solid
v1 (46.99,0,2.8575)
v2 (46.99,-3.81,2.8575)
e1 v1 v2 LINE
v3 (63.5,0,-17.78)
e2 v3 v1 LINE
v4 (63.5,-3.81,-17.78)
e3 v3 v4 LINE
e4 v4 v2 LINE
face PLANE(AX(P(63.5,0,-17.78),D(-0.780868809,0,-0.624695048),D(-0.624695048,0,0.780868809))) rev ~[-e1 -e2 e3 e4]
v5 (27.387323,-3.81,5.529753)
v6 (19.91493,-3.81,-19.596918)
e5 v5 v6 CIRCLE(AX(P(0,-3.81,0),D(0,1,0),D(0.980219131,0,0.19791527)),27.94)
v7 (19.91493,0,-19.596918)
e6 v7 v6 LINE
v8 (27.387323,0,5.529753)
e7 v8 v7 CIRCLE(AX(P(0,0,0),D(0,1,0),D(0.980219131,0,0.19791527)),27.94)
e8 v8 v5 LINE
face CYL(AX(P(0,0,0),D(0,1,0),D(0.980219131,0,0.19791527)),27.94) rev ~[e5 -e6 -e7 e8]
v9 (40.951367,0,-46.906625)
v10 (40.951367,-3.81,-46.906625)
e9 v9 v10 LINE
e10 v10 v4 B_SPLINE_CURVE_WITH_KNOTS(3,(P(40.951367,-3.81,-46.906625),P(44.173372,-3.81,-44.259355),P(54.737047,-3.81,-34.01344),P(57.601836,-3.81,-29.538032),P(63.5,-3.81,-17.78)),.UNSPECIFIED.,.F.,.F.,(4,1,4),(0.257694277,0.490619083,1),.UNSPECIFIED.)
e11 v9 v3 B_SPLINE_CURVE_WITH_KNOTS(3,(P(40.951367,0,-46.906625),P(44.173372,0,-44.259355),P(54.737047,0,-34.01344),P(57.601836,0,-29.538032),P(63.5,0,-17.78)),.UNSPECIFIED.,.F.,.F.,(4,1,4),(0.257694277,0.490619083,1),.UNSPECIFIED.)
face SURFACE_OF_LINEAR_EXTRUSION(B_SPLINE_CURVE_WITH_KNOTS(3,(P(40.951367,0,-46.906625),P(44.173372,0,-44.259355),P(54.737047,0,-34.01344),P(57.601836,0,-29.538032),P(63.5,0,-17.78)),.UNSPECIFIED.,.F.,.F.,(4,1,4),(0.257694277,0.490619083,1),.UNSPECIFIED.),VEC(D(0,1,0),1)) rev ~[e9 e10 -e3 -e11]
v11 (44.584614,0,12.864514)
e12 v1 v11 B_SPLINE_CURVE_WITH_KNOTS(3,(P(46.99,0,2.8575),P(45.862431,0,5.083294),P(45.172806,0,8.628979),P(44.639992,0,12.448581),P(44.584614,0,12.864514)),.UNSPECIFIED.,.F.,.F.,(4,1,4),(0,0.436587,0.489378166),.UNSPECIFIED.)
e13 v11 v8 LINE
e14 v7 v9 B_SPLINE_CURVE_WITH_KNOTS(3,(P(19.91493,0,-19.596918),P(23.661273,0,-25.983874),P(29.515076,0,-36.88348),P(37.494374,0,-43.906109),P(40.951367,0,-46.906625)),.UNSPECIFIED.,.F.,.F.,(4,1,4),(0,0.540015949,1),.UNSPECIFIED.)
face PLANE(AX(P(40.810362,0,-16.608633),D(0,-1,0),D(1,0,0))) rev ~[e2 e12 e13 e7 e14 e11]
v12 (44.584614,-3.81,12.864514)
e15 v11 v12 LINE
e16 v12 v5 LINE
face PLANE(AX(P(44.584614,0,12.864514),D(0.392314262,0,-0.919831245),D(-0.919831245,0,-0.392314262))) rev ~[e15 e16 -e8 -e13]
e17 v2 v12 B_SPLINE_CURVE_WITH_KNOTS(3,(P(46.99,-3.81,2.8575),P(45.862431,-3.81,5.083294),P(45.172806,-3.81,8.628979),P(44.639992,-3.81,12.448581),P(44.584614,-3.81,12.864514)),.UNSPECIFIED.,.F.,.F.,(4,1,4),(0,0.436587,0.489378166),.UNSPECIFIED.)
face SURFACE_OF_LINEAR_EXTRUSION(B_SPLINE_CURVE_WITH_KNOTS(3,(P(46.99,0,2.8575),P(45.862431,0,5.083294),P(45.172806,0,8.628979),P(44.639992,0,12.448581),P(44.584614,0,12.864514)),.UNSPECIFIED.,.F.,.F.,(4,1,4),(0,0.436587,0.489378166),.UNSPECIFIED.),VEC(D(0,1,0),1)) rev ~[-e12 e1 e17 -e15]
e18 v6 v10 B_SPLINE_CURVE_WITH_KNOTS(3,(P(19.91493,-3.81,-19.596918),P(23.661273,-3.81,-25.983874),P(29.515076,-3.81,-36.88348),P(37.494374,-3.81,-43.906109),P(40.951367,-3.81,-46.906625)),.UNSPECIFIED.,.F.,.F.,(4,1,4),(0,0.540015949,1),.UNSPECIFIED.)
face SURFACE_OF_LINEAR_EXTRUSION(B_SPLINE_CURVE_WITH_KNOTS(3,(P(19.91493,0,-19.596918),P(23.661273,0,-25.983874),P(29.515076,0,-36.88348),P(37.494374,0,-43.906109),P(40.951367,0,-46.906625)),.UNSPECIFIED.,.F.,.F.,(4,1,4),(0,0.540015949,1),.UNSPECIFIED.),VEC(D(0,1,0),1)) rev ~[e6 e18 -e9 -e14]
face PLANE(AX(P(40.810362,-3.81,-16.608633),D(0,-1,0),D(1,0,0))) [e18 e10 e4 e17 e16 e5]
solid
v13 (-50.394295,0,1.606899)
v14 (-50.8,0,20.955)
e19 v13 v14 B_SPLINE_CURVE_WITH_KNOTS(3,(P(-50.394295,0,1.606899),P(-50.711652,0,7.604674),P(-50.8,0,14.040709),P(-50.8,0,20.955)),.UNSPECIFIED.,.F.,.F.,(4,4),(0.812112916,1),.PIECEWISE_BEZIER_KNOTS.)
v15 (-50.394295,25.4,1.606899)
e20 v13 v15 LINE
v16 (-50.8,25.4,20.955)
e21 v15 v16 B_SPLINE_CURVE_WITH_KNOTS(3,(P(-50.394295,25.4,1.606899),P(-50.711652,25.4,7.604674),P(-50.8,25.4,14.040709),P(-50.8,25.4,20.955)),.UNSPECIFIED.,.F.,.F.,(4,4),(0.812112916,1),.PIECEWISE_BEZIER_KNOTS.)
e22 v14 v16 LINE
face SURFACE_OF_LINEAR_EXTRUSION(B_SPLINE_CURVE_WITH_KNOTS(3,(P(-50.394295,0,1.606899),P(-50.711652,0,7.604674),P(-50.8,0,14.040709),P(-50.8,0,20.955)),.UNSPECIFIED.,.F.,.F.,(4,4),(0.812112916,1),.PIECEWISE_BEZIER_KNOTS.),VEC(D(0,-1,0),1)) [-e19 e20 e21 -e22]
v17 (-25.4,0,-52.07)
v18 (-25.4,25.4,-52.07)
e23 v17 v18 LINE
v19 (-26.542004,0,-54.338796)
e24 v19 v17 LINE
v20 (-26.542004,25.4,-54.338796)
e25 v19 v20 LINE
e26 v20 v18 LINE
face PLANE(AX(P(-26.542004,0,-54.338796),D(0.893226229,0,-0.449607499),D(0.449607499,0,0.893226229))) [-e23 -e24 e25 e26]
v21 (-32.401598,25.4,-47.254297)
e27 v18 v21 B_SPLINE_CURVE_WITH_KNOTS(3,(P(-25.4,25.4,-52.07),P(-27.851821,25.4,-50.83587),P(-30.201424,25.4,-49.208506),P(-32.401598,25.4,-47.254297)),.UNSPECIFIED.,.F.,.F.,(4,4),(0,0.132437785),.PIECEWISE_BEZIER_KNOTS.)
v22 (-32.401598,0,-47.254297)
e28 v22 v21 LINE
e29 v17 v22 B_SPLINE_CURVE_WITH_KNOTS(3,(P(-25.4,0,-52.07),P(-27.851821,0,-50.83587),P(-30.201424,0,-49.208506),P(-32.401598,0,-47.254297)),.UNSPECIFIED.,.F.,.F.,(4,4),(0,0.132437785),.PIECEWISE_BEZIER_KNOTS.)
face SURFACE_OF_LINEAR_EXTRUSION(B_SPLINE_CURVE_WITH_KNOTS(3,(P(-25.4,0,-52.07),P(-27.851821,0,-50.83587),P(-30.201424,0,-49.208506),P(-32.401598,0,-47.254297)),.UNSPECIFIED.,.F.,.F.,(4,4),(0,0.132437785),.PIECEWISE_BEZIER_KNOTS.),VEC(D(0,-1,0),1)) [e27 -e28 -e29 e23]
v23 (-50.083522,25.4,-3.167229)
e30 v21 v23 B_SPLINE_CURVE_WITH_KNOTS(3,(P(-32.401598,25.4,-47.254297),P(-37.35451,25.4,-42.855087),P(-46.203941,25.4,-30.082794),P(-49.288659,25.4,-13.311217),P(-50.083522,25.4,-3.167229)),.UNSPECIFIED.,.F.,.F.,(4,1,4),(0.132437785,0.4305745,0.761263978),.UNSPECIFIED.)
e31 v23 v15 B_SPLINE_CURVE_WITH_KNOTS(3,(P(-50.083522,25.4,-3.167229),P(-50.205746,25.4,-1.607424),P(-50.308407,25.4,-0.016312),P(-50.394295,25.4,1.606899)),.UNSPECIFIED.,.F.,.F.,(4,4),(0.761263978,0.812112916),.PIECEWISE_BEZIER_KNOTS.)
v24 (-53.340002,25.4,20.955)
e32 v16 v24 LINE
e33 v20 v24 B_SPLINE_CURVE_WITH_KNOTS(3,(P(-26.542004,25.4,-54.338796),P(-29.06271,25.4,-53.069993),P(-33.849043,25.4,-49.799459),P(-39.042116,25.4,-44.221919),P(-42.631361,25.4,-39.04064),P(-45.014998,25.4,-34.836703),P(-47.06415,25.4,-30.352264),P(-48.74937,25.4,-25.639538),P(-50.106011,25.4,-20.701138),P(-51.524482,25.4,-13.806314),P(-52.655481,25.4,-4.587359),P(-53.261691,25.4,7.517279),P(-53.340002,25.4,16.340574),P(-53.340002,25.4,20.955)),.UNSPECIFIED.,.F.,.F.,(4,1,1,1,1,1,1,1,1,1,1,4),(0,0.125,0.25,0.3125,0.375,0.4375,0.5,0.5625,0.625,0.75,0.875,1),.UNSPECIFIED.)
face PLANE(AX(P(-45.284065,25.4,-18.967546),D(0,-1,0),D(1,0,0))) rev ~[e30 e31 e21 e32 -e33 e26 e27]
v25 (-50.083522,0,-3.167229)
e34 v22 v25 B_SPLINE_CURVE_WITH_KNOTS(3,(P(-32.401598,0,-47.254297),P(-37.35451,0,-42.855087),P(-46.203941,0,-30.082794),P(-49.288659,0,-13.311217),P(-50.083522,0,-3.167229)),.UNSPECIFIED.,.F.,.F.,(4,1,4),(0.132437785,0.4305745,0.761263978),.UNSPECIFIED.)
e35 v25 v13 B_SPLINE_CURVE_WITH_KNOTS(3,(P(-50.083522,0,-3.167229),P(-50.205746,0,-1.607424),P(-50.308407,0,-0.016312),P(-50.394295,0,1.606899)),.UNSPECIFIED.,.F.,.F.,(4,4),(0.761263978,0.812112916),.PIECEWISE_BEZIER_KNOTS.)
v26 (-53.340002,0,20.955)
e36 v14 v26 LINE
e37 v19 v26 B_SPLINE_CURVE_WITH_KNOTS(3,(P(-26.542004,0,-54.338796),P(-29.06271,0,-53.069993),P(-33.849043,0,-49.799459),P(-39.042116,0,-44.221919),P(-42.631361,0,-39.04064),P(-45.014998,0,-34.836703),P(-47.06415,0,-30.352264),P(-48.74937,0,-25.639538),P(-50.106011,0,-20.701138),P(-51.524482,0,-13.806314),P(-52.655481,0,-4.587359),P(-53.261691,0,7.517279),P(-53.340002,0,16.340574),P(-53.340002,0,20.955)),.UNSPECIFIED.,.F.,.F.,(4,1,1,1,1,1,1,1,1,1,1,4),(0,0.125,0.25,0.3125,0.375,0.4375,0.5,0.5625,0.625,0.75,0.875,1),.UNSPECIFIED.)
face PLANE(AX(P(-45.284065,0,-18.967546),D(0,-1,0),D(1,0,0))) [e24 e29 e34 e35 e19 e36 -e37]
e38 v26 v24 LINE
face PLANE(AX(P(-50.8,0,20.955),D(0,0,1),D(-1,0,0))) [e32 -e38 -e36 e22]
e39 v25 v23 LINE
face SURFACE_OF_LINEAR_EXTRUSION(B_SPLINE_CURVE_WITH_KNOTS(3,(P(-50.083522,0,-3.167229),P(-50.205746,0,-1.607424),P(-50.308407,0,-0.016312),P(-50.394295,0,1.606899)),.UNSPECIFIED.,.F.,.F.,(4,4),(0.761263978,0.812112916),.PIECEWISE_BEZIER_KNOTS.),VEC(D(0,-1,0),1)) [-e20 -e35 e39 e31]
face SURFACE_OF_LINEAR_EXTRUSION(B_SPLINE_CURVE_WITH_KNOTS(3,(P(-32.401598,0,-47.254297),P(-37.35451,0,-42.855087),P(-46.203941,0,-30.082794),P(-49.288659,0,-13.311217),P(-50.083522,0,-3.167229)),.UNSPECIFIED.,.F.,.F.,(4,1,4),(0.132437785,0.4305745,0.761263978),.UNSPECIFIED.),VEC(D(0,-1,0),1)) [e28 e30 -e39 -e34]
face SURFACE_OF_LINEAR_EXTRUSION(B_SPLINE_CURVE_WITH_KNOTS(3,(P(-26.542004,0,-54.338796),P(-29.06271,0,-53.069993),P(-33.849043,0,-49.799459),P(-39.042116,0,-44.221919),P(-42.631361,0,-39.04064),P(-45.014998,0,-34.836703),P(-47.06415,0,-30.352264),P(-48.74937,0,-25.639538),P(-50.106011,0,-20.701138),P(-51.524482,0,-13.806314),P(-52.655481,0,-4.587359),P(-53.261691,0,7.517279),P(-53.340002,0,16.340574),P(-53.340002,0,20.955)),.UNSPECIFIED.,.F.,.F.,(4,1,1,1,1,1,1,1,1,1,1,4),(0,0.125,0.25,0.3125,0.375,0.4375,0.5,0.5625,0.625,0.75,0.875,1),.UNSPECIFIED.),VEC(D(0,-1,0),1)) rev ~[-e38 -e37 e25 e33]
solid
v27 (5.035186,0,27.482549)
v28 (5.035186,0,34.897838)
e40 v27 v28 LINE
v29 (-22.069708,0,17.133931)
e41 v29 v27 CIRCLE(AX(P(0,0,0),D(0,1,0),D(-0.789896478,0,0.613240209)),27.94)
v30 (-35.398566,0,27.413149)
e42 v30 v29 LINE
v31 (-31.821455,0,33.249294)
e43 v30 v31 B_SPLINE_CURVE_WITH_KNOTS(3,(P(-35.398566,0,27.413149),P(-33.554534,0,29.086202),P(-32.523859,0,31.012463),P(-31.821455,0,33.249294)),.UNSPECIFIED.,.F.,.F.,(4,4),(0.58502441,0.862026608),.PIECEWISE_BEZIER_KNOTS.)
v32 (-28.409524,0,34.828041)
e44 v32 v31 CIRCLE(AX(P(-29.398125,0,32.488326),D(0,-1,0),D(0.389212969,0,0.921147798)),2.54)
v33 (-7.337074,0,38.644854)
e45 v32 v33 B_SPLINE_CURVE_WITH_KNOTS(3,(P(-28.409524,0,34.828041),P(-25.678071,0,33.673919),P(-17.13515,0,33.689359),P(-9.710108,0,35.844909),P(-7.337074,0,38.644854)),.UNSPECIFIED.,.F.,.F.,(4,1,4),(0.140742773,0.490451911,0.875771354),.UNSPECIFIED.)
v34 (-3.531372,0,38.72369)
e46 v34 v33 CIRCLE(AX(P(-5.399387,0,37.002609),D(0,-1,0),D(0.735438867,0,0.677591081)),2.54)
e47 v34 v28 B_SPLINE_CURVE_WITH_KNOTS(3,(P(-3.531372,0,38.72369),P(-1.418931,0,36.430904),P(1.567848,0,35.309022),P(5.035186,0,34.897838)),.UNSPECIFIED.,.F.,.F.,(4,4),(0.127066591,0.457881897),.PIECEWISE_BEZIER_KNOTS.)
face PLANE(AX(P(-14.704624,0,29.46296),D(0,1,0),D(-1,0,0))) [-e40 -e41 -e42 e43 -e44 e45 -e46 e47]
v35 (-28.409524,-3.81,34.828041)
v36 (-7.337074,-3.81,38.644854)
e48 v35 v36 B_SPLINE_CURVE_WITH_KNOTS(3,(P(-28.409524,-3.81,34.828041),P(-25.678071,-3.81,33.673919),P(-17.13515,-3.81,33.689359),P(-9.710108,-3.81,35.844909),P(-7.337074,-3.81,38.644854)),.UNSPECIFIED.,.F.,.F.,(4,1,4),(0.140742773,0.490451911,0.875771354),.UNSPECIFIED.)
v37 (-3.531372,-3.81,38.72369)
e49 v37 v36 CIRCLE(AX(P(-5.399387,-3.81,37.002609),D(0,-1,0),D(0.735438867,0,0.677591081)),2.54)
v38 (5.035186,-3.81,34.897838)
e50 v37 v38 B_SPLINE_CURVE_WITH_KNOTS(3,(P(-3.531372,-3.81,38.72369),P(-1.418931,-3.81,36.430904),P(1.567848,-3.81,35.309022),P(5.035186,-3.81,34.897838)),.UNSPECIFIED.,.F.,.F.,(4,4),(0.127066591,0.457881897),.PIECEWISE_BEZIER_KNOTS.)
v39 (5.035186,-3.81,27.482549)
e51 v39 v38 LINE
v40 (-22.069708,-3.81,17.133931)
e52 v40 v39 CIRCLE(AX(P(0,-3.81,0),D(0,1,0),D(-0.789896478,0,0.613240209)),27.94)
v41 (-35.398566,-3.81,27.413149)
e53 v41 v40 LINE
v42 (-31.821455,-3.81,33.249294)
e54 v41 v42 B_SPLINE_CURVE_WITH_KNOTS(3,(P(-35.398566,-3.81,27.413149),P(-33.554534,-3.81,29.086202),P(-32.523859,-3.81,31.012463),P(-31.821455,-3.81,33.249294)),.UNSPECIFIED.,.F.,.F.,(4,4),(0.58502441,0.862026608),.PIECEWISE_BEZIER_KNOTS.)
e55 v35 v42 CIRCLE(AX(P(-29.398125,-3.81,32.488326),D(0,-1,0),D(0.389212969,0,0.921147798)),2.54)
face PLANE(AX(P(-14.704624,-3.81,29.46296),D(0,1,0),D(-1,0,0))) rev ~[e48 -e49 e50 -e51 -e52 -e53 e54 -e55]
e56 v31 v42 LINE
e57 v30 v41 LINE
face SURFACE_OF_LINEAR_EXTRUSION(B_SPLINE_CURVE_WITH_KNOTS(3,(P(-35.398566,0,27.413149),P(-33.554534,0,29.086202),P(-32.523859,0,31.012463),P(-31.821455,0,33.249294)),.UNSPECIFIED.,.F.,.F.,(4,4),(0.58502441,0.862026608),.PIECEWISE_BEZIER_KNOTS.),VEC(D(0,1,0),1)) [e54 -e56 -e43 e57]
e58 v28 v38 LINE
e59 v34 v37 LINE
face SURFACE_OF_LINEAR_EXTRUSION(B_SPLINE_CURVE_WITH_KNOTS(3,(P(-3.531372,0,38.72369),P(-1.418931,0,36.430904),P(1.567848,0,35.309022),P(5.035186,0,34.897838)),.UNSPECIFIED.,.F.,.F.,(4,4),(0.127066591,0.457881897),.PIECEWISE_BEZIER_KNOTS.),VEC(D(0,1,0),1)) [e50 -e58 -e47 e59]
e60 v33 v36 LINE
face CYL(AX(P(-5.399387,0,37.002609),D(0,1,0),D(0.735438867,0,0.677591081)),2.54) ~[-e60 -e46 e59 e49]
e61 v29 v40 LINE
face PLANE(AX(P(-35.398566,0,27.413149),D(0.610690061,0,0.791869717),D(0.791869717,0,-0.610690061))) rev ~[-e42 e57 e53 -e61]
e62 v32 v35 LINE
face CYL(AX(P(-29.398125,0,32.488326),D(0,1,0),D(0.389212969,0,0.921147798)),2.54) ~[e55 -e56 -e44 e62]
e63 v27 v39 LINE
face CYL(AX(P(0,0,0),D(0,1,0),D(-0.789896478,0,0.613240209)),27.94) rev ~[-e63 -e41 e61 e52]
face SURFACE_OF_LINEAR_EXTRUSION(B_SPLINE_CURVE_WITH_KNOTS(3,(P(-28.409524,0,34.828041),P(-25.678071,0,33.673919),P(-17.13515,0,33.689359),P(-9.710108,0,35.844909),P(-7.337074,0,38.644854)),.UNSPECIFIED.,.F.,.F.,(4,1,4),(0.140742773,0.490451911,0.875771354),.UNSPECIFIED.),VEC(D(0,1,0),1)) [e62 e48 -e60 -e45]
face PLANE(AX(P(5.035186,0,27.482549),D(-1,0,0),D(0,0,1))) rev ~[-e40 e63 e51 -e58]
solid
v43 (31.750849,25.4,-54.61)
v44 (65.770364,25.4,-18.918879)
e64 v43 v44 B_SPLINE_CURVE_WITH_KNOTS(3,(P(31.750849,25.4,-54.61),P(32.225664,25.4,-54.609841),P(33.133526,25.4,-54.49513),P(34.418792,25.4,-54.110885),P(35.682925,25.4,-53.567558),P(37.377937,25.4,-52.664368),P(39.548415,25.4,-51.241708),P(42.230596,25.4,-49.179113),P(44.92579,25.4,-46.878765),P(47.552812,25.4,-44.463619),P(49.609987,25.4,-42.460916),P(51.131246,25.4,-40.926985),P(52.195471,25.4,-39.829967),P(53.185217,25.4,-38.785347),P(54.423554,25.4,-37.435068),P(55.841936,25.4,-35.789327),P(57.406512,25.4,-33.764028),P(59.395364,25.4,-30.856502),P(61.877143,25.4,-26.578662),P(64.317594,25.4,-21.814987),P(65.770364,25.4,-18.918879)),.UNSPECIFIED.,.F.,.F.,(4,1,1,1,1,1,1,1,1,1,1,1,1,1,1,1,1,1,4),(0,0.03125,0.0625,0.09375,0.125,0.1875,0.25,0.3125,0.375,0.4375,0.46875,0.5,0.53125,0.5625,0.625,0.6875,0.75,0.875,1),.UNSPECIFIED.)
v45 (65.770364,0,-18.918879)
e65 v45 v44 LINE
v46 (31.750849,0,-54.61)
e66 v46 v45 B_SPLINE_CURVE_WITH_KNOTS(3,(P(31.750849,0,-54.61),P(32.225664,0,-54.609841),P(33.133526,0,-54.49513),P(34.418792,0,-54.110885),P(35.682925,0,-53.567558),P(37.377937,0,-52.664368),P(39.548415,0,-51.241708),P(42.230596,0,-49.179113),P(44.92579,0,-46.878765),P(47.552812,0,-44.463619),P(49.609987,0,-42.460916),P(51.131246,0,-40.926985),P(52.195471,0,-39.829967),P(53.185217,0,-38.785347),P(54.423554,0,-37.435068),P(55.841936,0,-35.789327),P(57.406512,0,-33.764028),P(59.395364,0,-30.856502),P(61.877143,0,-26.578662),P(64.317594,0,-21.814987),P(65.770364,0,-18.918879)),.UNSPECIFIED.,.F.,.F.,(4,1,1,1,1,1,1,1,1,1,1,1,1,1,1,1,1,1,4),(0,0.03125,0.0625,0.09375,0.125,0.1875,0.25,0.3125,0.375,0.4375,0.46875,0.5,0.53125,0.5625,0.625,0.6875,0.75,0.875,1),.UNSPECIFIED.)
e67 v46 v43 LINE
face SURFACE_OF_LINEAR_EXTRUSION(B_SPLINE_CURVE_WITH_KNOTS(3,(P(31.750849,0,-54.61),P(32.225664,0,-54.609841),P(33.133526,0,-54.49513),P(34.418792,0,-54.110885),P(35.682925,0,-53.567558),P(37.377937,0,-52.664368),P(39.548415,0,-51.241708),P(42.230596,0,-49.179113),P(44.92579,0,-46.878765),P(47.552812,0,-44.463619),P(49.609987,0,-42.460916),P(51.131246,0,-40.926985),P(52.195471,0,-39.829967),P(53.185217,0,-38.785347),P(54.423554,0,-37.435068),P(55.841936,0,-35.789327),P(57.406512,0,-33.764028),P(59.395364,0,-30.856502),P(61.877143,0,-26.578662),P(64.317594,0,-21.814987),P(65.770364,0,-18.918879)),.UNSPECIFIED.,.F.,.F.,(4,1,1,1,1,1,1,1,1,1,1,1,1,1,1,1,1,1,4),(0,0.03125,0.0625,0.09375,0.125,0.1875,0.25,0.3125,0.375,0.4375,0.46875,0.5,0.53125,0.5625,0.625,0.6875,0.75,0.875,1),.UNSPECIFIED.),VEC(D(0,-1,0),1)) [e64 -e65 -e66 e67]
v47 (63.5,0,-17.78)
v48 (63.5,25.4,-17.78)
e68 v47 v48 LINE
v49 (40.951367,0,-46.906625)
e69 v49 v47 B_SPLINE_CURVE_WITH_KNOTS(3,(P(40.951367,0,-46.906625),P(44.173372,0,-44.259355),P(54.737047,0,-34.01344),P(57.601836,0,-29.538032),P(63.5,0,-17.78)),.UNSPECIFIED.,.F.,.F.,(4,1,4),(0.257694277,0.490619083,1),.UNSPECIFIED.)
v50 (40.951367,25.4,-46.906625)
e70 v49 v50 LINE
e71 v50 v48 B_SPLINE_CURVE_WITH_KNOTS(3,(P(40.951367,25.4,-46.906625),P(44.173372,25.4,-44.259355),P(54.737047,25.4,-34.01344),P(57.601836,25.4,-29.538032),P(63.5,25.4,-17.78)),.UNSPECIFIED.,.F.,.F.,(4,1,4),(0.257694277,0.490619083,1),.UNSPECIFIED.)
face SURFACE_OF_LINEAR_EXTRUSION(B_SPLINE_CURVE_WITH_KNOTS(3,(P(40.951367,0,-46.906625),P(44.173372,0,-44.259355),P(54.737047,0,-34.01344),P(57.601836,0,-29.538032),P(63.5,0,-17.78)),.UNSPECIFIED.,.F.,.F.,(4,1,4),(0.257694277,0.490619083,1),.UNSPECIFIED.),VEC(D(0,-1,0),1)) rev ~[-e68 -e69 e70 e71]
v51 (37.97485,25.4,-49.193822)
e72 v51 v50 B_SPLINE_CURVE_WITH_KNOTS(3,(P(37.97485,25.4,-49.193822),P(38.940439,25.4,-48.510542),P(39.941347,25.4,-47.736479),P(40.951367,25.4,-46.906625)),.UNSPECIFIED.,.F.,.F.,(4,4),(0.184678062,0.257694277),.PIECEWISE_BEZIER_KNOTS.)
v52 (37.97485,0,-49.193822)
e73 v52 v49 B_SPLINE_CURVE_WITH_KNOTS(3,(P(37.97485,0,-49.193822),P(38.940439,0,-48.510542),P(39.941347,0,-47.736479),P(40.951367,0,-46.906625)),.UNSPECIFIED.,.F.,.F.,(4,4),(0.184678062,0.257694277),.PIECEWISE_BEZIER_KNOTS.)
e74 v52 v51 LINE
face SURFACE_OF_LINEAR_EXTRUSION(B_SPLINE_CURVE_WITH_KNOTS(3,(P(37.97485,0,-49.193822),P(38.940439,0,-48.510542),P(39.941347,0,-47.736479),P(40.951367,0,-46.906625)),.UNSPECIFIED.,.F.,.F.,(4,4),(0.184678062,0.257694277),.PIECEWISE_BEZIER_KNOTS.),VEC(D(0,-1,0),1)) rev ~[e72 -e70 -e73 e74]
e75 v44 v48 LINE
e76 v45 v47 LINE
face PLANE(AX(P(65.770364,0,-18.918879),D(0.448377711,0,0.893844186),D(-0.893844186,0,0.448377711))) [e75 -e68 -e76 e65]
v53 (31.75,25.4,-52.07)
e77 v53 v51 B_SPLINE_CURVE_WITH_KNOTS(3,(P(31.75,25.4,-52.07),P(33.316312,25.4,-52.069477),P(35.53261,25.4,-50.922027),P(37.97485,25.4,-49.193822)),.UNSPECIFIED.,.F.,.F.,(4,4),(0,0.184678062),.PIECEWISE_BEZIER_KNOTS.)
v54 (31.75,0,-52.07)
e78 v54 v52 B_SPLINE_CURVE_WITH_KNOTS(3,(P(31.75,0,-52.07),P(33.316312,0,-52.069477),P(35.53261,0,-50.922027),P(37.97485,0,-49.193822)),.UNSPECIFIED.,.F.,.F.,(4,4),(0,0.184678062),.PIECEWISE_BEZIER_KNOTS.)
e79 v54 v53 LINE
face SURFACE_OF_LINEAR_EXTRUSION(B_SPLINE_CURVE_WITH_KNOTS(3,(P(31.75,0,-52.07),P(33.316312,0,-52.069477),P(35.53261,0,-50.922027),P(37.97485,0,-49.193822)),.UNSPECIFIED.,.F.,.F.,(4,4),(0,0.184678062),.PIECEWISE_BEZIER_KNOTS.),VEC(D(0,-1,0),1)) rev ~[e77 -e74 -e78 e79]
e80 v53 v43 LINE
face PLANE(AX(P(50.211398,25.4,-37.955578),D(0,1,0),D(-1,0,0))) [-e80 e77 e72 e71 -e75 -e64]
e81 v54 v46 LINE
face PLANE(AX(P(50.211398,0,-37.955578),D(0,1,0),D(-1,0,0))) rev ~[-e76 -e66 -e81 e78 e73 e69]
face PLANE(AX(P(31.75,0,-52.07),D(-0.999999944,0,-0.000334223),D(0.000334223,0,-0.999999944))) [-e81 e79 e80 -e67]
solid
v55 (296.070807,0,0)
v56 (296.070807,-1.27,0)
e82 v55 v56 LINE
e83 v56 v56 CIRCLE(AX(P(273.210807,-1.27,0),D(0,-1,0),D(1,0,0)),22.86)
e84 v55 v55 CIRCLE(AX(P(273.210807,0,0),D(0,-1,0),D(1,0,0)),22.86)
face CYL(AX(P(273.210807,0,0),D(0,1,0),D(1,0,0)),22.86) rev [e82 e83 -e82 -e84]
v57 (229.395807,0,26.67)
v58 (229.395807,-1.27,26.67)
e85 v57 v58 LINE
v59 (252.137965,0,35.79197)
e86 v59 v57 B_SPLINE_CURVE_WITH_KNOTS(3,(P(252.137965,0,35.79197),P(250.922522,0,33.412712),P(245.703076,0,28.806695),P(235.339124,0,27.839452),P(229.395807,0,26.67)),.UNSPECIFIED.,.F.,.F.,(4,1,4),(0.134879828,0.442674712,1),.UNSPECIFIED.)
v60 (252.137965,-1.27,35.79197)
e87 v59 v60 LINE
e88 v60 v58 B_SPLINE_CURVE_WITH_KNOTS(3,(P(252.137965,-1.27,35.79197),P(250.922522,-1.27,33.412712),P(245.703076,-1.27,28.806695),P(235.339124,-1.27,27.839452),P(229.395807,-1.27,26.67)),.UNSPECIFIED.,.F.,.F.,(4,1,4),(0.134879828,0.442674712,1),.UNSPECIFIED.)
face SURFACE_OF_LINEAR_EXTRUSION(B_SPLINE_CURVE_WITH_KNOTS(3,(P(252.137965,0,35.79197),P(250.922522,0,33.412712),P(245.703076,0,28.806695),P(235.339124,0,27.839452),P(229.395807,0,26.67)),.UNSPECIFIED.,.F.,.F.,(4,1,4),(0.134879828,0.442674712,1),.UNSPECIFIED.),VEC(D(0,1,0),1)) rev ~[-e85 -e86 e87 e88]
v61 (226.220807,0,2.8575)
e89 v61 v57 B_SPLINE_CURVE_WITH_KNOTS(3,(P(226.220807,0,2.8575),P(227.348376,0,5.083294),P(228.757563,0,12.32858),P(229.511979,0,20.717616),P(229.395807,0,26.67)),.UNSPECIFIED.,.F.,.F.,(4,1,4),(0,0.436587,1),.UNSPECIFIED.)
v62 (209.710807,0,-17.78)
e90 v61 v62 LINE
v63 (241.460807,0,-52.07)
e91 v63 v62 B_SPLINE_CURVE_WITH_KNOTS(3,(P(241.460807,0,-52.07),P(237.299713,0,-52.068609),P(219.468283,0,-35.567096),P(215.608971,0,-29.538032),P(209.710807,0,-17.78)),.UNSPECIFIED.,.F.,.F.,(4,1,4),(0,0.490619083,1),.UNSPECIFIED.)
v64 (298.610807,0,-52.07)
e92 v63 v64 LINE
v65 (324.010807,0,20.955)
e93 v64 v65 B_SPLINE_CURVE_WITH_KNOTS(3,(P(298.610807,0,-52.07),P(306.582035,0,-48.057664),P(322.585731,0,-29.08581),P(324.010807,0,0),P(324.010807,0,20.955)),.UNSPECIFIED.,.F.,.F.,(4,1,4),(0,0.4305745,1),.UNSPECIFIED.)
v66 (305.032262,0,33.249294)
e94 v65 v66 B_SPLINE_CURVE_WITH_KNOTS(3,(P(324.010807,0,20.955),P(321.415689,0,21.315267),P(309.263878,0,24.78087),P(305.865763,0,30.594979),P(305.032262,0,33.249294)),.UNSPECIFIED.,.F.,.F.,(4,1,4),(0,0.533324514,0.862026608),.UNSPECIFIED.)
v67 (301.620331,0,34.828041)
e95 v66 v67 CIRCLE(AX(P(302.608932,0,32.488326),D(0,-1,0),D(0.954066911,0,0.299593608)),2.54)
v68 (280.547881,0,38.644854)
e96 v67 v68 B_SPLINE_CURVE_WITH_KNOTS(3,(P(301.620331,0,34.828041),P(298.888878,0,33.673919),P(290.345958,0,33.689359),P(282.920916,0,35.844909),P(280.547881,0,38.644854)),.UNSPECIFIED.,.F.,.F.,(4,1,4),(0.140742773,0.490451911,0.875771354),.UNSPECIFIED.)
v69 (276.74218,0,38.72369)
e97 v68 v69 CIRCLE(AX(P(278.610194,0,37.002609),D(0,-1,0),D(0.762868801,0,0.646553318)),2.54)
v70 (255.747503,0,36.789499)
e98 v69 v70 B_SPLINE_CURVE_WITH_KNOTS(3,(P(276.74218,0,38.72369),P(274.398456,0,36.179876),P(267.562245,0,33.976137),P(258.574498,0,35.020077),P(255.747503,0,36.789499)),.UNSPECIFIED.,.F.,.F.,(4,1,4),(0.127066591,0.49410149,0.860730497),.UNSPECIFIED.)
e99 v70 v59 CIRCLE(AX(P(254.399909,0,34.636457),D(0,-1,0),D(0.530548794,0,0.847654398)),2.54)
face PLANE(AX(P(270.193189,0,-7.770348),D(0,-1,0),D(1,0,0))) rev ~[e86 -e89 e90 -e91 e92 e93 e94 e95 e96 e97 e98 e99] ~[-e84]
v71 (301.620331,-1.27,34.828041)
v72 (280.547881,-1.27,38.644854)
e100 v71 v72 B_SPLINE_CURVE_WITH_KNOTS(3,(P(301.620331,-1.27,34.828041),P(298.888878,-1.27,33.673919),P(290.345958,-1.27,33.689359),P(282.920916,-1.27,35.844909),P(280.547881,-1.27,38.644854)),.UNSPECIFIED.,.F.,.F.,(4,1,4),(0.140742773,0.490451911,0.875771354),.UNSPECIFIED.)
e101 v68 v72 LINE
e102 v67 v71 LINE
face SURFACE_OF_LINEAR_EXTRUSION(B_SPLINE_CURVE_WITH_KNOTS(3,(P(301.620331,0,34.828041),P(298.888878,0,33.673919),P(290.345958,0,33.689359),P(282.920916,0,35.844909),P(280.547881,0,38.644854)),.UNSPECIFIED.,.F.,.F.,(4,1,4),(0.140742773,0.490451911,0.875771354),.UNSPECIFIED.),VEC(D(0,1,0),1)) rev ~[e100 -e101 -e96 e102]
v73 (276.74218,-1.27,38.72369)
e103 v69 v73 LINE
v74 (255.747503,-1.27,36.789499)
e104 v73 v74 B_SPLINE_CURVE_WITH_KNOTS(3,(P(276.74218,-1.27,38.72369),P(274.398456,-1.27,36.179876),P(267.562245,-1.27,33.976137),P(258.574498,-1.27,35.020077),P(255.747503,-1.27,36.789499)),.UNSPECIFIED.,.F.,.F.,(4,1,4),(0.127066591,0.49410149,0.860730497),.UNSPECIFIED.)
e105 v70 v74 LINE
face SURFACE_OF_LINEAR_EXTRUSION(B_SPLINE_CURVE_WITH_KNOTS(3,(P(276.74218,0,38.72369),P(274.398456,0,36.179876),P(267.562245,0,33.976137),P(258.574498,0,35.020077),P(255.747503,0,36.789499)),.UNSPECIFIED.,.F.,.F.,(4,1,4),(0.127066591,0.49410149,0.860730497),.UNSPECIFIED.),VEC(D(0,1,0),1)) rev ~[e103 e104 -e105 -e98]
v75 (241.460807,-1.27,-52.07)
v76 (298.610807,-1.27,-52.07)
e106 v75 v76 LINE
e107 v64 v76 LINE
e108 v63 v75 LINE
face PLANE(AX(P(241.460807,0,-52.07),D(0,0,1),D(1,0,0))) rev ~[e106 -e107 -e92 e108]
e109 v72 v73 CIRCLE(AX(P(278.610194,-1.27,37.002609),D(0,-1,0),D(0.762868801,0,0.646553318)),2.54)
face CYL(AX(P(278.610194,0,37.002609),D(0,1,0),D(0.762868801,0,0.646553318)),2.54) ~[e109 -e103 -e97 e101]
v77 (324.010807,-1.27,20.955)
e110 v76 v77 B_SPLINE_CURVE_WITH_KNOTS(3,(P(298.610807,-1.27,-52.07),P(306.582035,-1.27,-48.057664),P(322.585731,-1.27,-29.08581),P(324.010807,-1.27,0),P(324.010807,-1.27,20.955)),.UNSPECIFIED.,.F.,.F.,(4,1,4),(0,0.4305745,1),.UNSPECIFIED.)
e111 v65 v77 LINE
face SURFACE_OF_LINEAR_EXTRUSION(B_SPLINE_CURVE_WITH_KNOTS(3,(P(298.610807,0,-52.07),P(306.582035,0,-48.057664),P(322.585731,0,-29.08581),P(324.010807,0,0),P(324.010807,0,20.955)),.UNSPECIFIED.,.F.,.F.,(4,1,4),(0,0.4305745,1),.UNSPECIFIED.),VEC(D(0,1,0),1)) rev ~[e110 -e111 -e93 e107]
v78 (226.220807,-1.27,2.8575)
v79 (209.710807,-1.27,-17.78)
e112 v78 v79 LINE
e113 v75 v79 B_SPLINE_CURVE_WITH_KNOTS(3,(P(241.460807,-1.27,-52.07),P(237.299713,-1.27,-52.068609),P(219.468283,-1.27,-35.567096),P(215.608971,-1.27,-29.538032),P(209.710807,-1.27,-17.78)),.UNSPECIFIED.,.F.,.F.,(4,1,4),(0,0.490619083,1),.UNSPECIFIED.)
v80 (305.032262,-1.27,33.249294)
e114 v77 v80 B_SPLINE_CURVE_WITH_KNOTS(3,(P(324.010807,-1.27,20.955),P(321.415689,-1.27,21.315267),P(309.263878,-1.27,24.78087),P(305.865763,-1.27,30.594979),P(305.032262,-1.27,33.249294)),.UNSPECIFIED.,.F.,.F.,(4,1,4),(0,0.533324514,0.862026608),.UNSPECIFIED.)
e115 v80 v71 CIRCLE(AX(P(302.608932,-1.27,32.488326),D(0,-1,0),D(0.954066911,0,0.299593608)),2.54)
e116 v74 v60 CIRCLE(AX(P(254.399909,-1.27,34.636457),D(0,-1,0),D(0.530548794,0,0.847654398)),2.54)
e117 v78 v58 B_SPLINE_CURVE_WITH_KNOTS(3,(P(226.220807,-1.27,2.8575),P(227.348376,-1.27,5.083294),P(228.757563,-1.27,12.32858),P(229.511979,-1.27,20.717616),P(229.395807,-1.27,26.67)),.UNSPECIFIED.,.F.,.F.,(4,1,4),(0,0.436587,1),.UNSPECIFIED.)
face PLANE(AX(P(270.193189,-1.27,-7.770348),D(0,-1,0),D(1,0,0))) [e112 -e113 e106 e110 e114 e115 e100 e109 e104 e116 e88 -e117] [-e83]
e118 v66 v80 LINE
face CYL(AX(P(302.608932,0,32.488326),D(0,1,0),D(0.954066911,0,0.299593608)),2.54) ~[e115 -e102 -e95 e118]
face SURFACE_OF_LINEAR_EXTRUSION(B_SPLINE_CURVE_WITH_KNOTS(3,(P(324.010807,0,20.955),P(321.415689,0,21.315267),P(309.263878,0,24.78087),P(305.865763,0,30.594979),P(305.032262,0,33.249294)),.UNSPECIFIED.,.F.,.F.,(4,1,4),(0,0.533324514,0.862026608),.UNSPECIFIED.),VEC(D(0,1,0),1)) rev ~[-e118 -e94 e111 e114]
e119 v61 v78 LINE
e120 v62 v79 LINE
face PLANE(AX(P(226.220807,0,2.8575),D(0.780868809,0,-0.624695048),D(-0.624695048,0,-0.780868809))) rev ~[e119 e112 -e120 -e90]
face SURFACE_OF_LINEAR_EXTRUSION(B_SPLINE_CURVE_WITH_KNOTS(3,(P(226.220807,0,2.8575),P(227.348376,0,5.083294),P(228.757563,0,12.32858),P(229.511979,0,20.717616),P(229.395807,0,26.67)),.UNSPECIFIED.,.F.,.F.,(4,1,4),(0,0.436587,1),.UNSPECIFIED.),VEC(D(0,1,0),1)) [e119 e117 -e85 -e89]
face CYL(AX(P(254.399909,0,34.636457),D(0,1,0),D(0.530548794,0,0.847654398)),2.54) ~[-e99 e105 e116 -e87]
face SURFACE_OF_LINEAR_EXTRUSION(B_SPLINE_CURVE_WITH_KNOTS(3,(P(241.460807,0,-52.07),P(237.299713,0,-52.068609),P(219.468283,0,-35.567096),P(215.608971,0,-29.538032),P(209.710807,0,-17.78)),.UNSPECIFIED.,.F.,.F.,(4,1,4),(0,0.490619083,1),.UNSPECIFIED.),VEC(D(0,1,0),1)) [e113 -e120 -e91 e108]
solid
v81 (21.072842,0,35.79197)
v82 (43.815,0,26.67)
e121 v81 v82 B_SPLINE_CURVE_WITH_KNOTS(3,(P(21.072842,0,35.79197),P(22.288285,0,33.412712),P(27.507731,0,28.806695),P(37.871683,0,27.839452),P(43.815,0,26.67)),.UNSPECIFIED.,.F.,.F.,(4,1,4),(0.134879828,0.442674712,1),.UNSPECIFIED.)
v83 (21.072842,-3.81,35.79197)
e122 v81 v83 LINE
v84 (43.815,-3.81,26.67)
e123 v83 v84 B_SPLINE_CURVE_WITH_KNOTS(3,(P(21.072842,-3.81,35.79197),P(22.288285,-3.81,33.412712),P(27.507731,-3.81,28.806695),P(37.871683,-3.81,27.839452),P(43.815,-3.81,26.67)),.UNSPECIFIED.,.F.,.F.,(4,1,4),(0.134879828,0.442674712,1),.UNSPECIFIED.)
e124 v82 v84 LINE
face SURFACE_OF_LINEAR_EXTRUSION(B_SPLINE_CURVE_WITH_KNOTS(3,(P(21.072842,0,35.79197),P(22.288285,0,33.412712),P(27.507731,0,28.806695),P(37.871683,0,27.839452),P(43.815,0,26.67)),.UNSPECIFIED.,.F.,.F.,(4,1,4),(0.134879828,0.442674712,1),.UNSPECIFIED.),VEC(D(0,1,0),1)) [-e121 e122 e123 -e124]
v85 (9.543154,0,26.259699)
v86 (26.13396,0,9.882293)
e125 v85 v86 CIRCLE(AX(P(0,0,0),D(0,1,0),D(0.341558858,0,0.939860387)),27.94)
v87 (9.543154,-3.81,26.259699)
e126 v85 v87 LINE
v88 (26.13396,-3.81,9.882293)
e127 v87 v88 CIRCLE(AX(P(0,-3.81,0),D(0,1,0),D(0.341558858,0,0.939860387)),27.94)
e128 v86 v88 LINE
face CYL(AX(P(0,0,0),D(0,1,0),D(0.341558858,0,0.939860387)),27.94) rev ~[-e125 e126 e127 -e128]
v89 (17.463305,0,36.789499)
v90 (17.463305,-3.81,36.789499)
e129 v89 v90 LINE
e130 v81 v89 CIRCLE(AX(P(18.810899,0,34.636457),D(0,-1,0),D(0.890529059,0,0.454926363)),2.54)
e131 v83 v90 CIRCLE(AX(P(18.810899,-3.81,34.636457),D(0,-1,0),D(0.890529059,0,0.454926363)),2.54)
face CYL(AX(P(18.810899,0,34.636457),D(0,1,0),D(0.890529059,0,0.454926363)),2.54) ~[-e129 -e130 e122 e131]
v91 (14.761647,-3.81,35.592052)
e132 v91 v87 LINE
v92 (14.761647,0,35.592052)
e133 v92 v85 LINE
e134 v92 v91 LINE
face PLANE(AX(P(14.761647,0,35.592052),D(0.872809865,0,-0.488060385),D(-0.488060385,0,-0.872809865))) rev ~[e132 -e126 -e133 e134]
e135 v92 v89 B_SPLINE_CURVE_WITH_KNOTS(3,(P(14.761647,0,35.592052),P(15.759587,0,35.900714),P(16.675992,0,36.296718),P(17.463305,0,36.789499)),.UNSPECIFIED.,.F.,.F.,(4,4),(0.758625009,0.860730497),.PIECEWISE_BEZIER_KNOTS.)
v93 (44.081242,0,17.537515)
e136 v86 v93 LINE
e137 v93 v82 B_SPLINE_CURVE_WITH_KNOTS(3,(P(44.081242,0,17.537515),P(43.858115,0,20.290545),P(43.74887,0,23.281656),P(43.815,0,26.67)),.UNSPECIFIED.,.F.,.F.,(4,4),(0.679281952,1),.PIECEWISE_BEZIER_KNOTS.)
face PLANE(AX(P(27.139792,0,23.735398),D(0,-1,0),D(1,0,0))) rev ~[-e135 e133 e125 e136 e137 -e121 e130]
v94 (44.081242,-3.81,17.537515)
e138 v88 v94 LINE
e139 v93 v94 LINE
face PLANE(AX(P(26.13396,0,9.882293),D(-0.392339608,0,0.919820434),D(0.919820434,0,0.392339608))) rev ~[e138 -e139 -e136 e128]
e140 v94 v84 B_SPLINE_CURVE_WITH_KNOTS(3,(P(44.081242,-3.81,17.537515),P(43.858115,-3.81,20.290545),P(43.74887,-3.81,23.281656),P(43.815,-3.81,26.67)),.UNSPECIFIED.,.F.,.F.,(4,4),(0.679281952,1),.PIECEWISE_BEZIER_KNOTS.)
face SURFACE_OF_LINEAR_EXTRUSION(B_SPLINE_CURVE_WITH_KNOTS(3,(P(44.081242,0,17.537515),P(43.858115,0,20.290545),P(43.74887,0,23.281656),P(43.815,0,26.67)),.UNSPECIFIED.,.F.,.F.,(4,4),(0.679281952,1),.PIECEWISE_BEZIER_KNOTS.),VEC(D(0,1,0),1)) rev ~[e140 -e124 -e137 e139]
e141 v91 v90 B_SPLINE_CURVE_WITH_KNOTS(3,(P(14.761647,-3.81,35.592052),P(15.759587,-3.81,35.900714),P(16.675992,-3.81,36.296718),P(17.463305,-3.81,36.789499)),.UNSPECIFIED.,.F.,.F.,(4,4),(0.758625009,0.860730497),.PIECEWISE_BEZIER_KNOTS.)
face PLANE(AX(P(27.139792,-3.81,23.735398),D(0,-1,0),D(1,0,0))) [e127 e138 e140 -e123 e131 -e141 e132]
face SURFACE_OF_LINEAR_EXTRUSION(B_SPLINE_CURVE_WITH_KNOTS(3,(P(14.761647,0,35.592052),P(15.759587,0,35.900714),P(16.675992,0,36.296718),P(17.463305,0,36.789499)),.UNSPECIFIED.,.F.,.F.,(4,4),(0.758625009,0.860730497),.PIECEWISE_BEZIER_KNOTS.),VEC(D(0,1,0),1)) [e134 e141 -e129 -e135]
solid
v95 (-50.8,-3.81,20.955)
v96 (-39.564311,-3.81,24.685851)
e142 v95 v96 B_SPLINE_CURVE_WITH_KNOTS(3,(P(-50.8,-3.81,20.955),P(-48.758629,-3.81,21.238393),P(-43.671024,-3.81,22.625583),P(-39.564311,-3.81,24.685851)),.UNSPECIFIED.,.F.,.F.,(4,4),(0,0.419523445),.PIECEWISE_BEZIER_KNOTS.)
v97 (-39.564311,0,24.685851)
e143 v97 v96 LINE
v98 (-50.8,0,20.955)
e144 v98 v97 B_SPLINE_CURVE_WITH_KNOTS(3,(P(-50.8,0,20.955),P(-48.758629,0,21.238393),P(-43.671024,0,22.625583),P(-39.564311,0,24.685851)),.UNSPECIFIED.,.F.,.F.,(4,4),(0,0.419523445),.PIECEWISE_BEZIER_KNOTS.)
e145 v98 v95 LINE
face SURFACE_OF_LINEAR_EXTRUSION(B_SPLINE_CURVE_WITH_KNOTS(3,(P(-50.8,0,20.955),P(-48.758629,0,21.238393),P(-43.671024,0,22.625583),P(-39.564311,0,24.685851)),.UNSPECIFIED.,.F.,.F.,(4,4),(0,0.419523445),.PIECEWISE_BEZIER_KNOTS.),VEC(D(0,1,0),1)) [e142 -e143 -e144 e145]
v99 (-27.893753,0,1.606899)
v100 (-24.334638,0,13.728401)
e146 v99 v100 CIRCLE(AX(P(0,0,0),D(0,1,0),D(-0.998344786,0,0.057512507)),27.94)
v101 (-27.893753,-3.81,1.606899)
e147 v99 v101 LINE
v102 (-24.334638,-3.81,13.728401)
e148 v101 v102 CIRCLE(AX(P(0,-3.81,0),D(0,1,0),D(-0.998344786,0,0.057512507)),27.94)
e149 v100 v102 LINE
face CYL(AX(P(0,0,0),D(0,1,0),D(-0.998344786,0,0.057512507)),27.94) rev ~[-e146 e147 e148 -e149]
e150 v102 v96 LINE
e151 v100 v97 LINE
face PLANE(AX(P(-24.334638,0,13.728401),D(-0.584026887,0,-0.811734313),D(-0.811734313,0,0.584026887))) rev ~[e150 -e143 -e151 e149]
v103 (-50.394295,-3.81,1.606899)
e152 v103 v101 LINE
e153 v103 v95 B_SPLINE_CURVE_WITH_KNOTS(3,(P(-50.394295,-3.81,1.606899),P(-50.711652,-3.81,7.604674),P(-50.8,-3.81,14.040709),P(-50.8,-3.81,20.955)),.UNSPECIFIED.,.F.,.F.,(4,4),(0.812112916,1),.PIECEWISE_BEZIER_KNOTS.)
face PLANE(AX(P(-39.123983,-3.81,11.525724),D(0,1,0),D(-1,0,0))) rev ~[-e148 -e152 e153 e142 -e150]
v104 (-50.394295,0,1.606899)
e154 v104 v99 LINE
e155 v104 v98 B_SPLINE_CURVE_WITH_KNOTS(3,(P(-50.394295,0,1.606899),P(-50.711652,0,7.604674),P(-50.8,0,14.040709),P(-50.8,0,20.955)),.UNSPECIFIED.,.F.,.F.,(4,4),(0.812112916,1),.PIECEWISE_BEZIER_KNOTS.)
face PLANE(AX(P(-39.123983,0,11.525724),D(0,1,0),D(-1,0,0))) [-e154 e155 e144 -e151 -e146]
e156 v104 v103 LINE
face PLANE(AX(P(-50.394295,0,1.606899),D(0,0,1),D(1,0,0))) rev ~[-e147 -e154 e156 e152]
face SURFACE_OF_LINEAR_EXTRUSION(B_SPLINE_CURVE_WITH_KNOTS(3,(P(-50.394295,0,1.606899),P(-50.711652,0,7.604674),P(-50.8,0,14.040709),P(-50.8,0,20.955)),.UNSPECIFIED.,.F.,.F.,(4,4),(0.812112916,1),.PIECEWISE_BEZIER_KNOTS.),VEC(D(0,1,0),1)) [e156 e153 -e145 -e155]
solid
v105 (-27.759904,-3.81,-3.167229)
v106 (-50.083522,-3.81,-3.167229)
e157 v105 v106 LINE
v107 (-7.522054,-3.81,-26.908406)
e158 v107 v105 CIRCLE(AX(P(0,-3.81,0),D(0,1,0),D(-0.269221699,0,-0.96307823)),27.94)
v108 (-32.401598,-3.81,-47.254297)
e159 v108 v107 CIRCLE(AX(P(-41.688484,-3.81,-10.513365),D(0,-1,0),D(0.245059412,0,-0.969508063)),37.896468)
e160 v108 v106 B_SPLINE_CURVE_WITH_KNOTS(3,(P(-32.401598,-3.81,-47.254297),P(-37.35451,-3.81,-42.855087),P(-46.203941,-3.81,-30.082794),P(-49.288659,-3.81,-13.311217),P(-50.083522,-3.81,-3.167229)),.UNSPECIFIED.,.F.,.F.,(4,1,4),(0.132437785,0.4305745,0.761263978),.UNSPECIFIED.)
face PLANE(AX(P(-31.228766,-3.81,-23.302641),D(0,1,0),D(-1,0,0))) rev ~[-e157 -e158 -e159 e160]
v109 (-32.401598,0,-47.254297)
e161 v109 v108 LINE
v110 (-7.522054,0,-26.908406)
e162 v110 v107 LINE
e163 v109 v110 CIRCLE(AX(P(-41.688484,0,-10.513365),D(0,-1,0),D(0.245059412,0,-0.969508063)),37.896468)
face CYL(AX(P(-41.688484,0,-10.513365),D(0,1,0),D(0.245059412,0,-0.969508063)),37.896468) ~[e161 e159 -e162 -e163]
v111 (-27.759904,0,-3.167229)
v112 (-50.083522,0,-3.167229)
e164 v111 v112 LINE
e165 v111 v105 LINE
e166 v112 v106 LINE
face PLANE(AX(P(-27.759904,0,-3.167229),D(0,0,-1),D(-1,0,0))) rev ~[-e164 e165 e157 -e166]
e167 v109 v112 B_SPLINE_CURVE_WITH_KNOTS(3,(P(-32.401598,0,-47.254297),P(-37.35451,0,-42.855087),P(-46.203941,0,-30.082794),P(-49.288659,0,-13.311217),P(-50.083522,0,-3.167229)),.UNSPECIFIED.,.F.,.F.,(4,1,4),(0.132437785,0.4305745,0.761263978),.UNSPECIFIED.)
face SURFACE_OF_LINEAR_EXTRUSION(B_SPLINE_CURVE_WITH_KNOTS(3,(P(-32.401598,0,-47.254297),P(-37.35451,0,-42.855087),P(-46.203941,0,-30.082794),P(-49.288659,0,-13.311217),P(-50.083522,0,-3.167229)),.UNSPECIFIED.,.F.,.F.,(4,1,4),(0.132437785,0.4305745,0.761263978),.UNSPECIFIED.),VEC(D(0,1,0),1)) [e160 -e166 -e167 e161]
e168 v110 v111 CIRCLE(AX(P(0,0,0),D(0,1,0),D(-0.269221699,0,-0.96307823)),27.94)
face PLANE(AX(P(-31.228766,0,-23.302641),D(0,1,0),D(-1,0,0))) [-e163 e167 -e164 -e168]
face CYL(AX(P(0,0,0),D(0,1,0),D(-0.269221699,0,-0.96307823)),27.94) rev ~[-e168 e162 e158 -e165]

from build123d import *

# Parameters (mm, degrees)
F1_DEPTH = 3.81
F2_DEPTH = 25.4
F0_R     = 22.86
F3_DEPTH = 1.27


# Not quite as in the source:
# - the dataset's text gives a spline's control points without its knots; the knots are read off the source's solid


with BuildPart() as f1:
    # F0 (on Front) → F1 (new body)
    with BuildSketch(Plane.XZ):
        with BuildLine():
            add(Edge.make_bspline(
                [(-32.4015982609, -47.2542967092), (-37.3545101899, -42.8550868765), (-46.2039408348, -30.0827942932), (-49.2886590635, -13.3112173003), (-50.0835223991, -3.1672286712)],
                knots=[0.1324377854, 0.1324377854, 0.1324377854, 0.1324377854, 0.4305745002, 0.7612639779, 0.7612639779, 0.7612639779, 0.7612639779], degree=3))
            ThreePointArc((-32.4015982609, -47.2542967092), (-17.6981427389, -39.8494489219), (-7.5220542761, -26.90840574))
            ThreePointArc((-7.5220542761, -26.90840574), (-21.2629963717, -18.1253575219), (-27.7599038641, -3.1672286712))
            Line((-27.7599038641, -3.1672286712), (-50.0835223991, -3.1672286712))
        make_face()
    extrude(amount=F1_DEPTH)


with BuildPart() as f1b:
    # F0 (on Front) → F1, piece 2 (new body)
    with BuildSketch(Plane.XZ):
        with BuildLine():
            add(Edge.make_bspline(
                [(-50.3942953675, 1.6068994458), (-50.7116523317, 7.6046741304), (-50.8, 14.040708595), (-50.8, 20.955)],
                knots=[0.8121129163, 0.8121129163, 0.8121129163, 0.8121129163, 1, 1, 1, 1], degree=3))
            Line((-50.3942953675, 1.6068994458), (-27.8937533181, 1.6068994458))
            ThreePointArc((-27.8937533181, 1.6068994458), (-26.8082807521, 7.8714473331), (-24.3346381376, 13.728400734))
            Line((-24.3346381376, 13.728400734), (-39.5643113353, 24.685851328))
            add(Edge.make_bspline(
                [(-50.8, 20.955), (-48.7586294455, 21.2383932933), (-43.6710240911, 22.6255829589), (-39.5643113353, 24.685851328)],
                knots=[0, 0, 0, 0, 0.4195234448, 0.4195234448, 0.4195234448, 0.4195234448], degree=3))
        make_face()
    extrude(amount=F1_DEPTH)


with BuildPart() as f1c:
    # F0 (on Front) → F1, piece 3 (new body)
    with BuildSketch(Plane.XZ):
        with BuildLine():
            add(Edge.make_bspline(
                [(19.914929673, -19.5969175158), (23.6612726725, -25.9838738604), (29.5150758275, -36.8834797497), (37.494373544, -43.9061090328), (40.9513666547, -46.9066246366)],
                knots=[0, 0, 0, 0, 0.5400159495, 1, 1, 1, 1], degree=3))
            add(Edge.make_bspline(
                [(40.9513666547, -46.9066246366), (44.1733718974, -44.2593550986), (54.7370471064, -34.0134404836), (57.6018359563, -29.538032362), (63.5, -17.78)],
                knots=[0.2576942768, 0.2576942768, 0.2576942768, 0.2576942768, 0.4906190831, 1, 1, 1, 1], degree=3))
            Line((63.5, -17.78), (46.99, 2.8575))
            add(Edge.make_bspline(
                [(46.99, 2.8575), (45.862430977, 5.0832937801), (45.1728056088, 8.6289787064), (44.6399921579, 12.4485812477), (44.5846144842, 12.8645142485)],
                knots=[0, 0, 0, 0, 0.4365870001, 0.489378166, 0.489378166, 0.489378166, 0.489378166], degree=3))
            Line((44.5846144842, 12.8645142485), (27.3873225339, 5.5297526549))
            ThreePointArc((27.3873225339, 5.5297526549), (26.7808355812, -7.9643232966), (19.914929673, -19.5969175158))
        make_face()
    extrude(amount=F1_DEPTH)


with BuildPart() as f1d:
    # F0 (on Front) → F1, piece 4 (new body)
    with BuildSketch(Plane.XZ):
        with BuildLine():
            add(Edge.make_bspline(
                [(-35.3985657611, 27.4131491477), (-33.5545344545, 29.0862015789), (-32.5238587747, 31.0124628081), (-31.8214549811, 33.2492936319)],
                knots=[0.5850244101, 0.5850244101, 0.5850244101, 0.5850244101, 0.8620266084, 0.8620266084, 0.8620266084, 0.8620266084], degree=3))
            Line((-35.3985657611, 27.4131491477), (-22.0697075917, 17.1339314466))
            ThreePointArc((-22.0697075917, 17.1339314466), (-9.9658017904, 26.1022296878), (5.035185755, 27.4825490887))
            Line((5.035185755, 27.4825490887), (5.035185755, 34.8978384418))
            add(Edge.make_bspline(
                [(-3.5313723507, 38.7236903364), (-1.4189307014, 36.4309038194), (1.5678475341, 35.3090215627), (5.035185755, 34.8978384418)],
                knots=[0.1270665909, 0.1270665909, 0.1270665909, 0.1270665909, 0.4578818969, 0.4578818969, 0.4578818969, 0.4578818969], degree=3))
            ThreePointArc((-3.5313723507, 38.7236903364), (-5.4519924297, 39.5420641845), (-7.337073828, 38.6448544183))
            add(Edge.make_bspline(
                [(-28.4095240871, 34.8280412728), (-25.6780710844, 33.673919279), (-17.1351502938, 33.689358767), (-9.7101082233, 35.8449091476), (-7.337073828, 38.6448544183)],
                knots=[0.1407427733, 0.1407427733, 0.1407427733, 0.1407427733, 0.4904519108, 0.8757713542, 0.8757713542, 0.8757713542, 0.8757713542], degree=3))
            ThreePointArc((-28.4095240871, 34.8280412728), (-30.4647659531, 34.7935107051), (-31.8214549811, 33.2492936319))
        make_face()
    extrude(amount=F1_DEPTH)


with BuildPart() as f1e:
    # F0 (on Front) → F1, piece 5 (new body)
    with BuildSketch(Plane.XZ):
        with BuildLine():
            ThreePointArc((9.5431544801, 26.2596992094), (19.6282702033, 19.8840289888), (26.1339604159, 9.882292901))
            Line((26.1339604159, 9.882292901), (44.0812421649, 17.5375147581))
            add(Edge.make_bspline(
                [(44.0812421649, 17.5375147581), (43.858115131, 20.2905449954), (43.7488704096, 23.2816558809), (43.815, 26.67)],
                knots=[0.6792819517, 0.6792819517, 0.6792819517, 0.6792819517, 1, 1, 1, 1], degree=3))
            add(Edge.make_bspline(
                [(21.0728423917, 35.7919701026), (22.28828545, 33.4127117189), (27.5077311439, 28.806695039), (37.8716832047, 27.8394519795), (43.815, 26.67)],
                knots=[0.1348798284, 0.1348798284, 0.1348798284, 0.1348798284, 0.4426747117, 1, 1, 1, 1], degree=3))
            ThreePointArc((21.0728423917, 35.7919701026), (19.4874893399, 37.084686082), (17.4633046468, 36.7894993108))
            add(Edge.make_bspline(
                [(14.7616470372, 35.5920521842), (15.7595866428, 35.900713839), (16.6759917562, 36.2967184021), (17.4633046468, 36.7894993108)],
                knots=[0.7586250088, 0.7586250088, 0.7586250088, 0.7586250088, 0.8607304966, 0.8607304966, 0.8607304966, 0.8607304966], degree=3))
            Line((14.7616470372, 35.5920521842), (9.5431544801, 26.2596992094))
        make_face()
    extrude(amount=F1_DEPTH)


with BuildPart() as f2:
    # F0 (on Front) → F2 (new body)
    with BuildSketch(Plane.XZ):
        with BuildLine():
            Line((-26.5420038104, -54.3387961377), (-25.4, -52.07))
            add(Edge.make_bspline(
                [(-25.4, -52.07), (-27.8518213277, -50.8358700348), (-30.2014241314, -49.2085062334), (-32.4015982609, -47.2542967092)],
                knots=[0, 0, 0, 0, 0.1324377854, 0.1324377854, 0.1324377854, 0.1324377854], degree=3))
            add(Edge.make_bspline(
                [(-32.4015982609, -47.2542967092), (-37.3545101899, -42.8550868765), (-46.2039408348, -30.0827942932), (-49.2886590635, -13.3112173003), (-50.0835223991, -3.1672286712)],
                knots=[0.1324377854, 0.1324377854, 0.1324377854, 0.1324377854, 0.4305745002, 0.7612639779, 0.7612639779, 0.7612639779, 0.7612639779], degree=3))
            add(Edge.make_bspline(
                [(-50.0835223991, -3.1672286712), (-50.2057456917, -1.6074238163), (-50.308407267, -0.0163120564), (-50.3942953675, 1.6068994458)],
                knots=[0.7612639779, 0.7612639779, 0.7612639779, 0.7612639779, 0.8121129163, 0.8121129163, 0.8121129163, 0.8121129163], degree=3))
            add(Edge.make_bspline(
                [(-50.3942953675, 1.6068994458), (-50.7116523317, 7.6046741304), (-50.8, 14.040708595), (-50.8, 20.955)],
                knots=[0.8121129163, 0.8121129163, 0.8121129163, 0.8121129163, 1, 1, 1, 1], degree=3))
            Line((-50.8, 20.955), (-53.3400016963, 20.955))
            add(Edge.make_bspline(
                [(-26.5420038104, -54.3387961377), (-29.0627100455, -53.0699927941), (-33.8490428694, -49.7994585613), (-39.0421158261, -44.2219190116), (-42.6313614699, -39.0406400188), (-45.0149981604, -34.8367031295), (-47.0641498349, -30.3522635024), (-48.7493698024, -25.6395384607), (-50.1060112231, -20.7011376547), (-51.5244817953, -13.8063144268), (-52.6554809616, -4.5873586327), (-53.2616912763, 7.5172788692), (-53.3400016963, 16.3405741938), (-53.3400016963, 20.955)],
                knots=[0, 0, 0, 0, 0.125, 0.25, 0.3125, 0.375, 0.4375, 0.5, 0.5625, 0.625, 0.75, 0.875, 1, 1, 1, 1], degree=3))
        make_face()
    extrude(amount=-F2_DEPTH)


with BuildPart() as f2b:
    # F0 (on Front) → F2, piece 2 (new body)
    with BuildSketch(Plane.XZ):
        with BuildLine():
            add(Edge.make_bspline(
                [(31.75, -52.07), (33.3163124064, -52.0694765021), (35.5326097167, -50.9220271224), (37.9748498683, -49.1938224865)],
                knots=[0, 0, 0, 0, 0.1846780617, 0.1846780617, 0.1846780617, 0.1846780617], degree=3))
            Line((31.75, -52.07), (31.7508489268, -54.6099998581))
            add(Edge.make_bspline(
                [(31.7508489268, -54.6099998581), (32.2256640176, -54.6098411639), (33.1335262146, -54.4951302851), (34.4187918601, -54.110885336), (35.682925068, -53.5675580748), (37.3779369898, -52.6643683647), (39.5484147263, -51.2417084284), (42.2305963042, -49.1791129251), (44.9257896, -46.8787646379), (47.5528122711, -44.4636194039), (49.6099867185, -42.4609157239), (51.1312464786, -40.9269854625), (52.195470601, -39.8299669872), (53.1852172114, -38.7853468766), (54.4235542152, -37.4350675119), (55.8419358132, -35.7893265179), (57.4065121682, -33.7640279942), (59.3953643105, -30.856502217), (61.8771429381, -26.5786619273), (64.3175942448, -21.8149867836), (65.7703642316, -18.918879386)],
                knots=[0, 0, 0, 0, 0.03125, 0.0625, 0.09375, 0.125, 0.1875, 0.25, 0.3125, 0.375, 0.4375, 0.46875, 0.5, 0.53125, 0.5625, 0.625, 0.6875, 0.75, 0.875, 1, 1, 1, 1], degree=3))
            Line((65.7703642316, -18.918879386), (63.5, -17.78))
            add(Edge.make_bspline(
                [(40.9513666547, -46.9066246366), (44.1733718974, -44.2593550986), (54.7370471064, -34.0134404836), (57.6018359563, -29.538032362), (63.5, -17.78)],
                knots=[0.2576942768, 0.2576942768, 0.2576942768, 0.2576942768, 0.4906190831, 1, 1, 1, 1], degree=3))
            add(Edge.make_bspline(
                [(37.9748498683, -49.1938224865), (38.9404390166, -48.5105417529), (39.9413470189, -47.7364787222), (40.9513666547, -46.9066246366)],
                knots=[0.1846780617, 0.1846780617, 0.1846780617, 0.1846780617, 0.2576942768, 0.2576942768, 0.2576942768, 0.2576942768], degree=3))
        make_face()
    extrude(amount=-F2_DEPTH)


with BuildPart() as f3:
    # F0 (on Front) → F3 (new body)
    with BuildSketch(Plane.XZ):
        with BuildLine():
            ThreePointArc((255.7475026767, 36.7894993108), (253.7233179835, 37.084686082), (252.1379649318, 35.7919701026))
            add(Edge.make_bspline(
                [(252.1379649318, 35.7919701026), (250.9225218734, 33.4127117189), (245.7030761795, 28.806695039), (235.3391241187, 27.8394519795), (229.3958073235, 26.67)],
                knots=[0.1348798284, 0.1348798284, 0.1348798284, 0.1348798284, 0.4426747117, 1, 1, 1, 1], degree=3))
            add(Edge.make_bspline(
                [(226.2208073235, 2.8575), (227.3483763465, 5.0832937801), (228.7575633843, 12.3285800892), (229.5119787429, 20.7176155465), (229.3958073235, 26.67)],
                knots=[0, 0, 0, 0, 0.4365870001, 1, 1, 1, 1], degree=3))
            Line((226.2208073235, 2.8575), (209.7108073235, -17.78))
            add(Edge.make_bspline(
                [(241.4608073235, -52.07), (237.29971342, -52.0686092659), (219.4682826462, -35.5670955658), (215.6089713672, -29.538032362), (209.7108073235, -17.78)],
                knots=[0, 0, 0, 0, 0.4906190831, 1, 1, 1, 1], degree=3))
            Line((241.4608073235, -52.07), (298.6108073235, -52.07))
            add(Edge.make_bspline(
                [(298.6108073235, -52.07), (306.5820350195, -48.0576640078), (322.5857309093, -29.0858098177), (324.0108073235, 0), (324.0108073235, 20.955)],
                knots=[0, 0, 0, 0, 0.4305745002, 1, 1, 1, 1], degree=3))
            add(Edge.make_bspline(
                [(324.0108073235, 20.955), (321.4156890461, 21.315267328), (309.2638781363, 24.7808695382), (305.8657632634, 30.5949790437), (305.0322623045, 33.2492936319)],
                knots=[0, 0, 0, 0, 0.5333245143, 0.8620266084, 0.8620266084, 0.8620266084, 0.8620266084], degree=3))
            ThreePointArc((305.0322623045, 33.2492936319), (303.6755732765, 34.7935107051), (301.6203314105, 34.8280412728))
            add(Edge.make_bspline(
                [(301.6203314105, 34.8280412728), (298.8888784079, 33.673919279), (290.3459576173, 33.689358767), (282.9209155468, 35.8449091476), (280.5478811515, 38.6448544183)],
                knots=[0.1407427733, 0.1407427733, 0.1407427733, 0.1407427733, 0.4904519108, 0.8757713542, 0.8757713542, 0.8757713542, 0.8757713542], degree=3))
            ThreePointArc((280.5478811515, 38.6448544183), (278.6627997531, 39.5420641845), (276.7421796741, 38.7236903364))
            add(Edge.make_bspline(
                [(276.7421796741, 38.7236903364), (274.3984555692, 36.1798761539), (267.5622447281, 33.976136877), (258.5744980657, 35.0200765395), (255.7475026767, 36.7894993108)],
                knots=[0.1270665909, 0.1270665909, 0.1270665909, 0.1270665909, 0.4941014897, 0.8607304966, 0.8607304966, 0.8607304966, 0.8607304966], degree=3))
        make_face()
        with Locations((273.2108073235, 0)):
            Circle(F0_R, mode=Mode.SUBTRACT)
    extrude(amount=F3_DEPTH)


solid = Compound([f1.part, f1b.part, f1c.part, f1d.part, f1e.part, f2.part, f2b.part, f3.part])
